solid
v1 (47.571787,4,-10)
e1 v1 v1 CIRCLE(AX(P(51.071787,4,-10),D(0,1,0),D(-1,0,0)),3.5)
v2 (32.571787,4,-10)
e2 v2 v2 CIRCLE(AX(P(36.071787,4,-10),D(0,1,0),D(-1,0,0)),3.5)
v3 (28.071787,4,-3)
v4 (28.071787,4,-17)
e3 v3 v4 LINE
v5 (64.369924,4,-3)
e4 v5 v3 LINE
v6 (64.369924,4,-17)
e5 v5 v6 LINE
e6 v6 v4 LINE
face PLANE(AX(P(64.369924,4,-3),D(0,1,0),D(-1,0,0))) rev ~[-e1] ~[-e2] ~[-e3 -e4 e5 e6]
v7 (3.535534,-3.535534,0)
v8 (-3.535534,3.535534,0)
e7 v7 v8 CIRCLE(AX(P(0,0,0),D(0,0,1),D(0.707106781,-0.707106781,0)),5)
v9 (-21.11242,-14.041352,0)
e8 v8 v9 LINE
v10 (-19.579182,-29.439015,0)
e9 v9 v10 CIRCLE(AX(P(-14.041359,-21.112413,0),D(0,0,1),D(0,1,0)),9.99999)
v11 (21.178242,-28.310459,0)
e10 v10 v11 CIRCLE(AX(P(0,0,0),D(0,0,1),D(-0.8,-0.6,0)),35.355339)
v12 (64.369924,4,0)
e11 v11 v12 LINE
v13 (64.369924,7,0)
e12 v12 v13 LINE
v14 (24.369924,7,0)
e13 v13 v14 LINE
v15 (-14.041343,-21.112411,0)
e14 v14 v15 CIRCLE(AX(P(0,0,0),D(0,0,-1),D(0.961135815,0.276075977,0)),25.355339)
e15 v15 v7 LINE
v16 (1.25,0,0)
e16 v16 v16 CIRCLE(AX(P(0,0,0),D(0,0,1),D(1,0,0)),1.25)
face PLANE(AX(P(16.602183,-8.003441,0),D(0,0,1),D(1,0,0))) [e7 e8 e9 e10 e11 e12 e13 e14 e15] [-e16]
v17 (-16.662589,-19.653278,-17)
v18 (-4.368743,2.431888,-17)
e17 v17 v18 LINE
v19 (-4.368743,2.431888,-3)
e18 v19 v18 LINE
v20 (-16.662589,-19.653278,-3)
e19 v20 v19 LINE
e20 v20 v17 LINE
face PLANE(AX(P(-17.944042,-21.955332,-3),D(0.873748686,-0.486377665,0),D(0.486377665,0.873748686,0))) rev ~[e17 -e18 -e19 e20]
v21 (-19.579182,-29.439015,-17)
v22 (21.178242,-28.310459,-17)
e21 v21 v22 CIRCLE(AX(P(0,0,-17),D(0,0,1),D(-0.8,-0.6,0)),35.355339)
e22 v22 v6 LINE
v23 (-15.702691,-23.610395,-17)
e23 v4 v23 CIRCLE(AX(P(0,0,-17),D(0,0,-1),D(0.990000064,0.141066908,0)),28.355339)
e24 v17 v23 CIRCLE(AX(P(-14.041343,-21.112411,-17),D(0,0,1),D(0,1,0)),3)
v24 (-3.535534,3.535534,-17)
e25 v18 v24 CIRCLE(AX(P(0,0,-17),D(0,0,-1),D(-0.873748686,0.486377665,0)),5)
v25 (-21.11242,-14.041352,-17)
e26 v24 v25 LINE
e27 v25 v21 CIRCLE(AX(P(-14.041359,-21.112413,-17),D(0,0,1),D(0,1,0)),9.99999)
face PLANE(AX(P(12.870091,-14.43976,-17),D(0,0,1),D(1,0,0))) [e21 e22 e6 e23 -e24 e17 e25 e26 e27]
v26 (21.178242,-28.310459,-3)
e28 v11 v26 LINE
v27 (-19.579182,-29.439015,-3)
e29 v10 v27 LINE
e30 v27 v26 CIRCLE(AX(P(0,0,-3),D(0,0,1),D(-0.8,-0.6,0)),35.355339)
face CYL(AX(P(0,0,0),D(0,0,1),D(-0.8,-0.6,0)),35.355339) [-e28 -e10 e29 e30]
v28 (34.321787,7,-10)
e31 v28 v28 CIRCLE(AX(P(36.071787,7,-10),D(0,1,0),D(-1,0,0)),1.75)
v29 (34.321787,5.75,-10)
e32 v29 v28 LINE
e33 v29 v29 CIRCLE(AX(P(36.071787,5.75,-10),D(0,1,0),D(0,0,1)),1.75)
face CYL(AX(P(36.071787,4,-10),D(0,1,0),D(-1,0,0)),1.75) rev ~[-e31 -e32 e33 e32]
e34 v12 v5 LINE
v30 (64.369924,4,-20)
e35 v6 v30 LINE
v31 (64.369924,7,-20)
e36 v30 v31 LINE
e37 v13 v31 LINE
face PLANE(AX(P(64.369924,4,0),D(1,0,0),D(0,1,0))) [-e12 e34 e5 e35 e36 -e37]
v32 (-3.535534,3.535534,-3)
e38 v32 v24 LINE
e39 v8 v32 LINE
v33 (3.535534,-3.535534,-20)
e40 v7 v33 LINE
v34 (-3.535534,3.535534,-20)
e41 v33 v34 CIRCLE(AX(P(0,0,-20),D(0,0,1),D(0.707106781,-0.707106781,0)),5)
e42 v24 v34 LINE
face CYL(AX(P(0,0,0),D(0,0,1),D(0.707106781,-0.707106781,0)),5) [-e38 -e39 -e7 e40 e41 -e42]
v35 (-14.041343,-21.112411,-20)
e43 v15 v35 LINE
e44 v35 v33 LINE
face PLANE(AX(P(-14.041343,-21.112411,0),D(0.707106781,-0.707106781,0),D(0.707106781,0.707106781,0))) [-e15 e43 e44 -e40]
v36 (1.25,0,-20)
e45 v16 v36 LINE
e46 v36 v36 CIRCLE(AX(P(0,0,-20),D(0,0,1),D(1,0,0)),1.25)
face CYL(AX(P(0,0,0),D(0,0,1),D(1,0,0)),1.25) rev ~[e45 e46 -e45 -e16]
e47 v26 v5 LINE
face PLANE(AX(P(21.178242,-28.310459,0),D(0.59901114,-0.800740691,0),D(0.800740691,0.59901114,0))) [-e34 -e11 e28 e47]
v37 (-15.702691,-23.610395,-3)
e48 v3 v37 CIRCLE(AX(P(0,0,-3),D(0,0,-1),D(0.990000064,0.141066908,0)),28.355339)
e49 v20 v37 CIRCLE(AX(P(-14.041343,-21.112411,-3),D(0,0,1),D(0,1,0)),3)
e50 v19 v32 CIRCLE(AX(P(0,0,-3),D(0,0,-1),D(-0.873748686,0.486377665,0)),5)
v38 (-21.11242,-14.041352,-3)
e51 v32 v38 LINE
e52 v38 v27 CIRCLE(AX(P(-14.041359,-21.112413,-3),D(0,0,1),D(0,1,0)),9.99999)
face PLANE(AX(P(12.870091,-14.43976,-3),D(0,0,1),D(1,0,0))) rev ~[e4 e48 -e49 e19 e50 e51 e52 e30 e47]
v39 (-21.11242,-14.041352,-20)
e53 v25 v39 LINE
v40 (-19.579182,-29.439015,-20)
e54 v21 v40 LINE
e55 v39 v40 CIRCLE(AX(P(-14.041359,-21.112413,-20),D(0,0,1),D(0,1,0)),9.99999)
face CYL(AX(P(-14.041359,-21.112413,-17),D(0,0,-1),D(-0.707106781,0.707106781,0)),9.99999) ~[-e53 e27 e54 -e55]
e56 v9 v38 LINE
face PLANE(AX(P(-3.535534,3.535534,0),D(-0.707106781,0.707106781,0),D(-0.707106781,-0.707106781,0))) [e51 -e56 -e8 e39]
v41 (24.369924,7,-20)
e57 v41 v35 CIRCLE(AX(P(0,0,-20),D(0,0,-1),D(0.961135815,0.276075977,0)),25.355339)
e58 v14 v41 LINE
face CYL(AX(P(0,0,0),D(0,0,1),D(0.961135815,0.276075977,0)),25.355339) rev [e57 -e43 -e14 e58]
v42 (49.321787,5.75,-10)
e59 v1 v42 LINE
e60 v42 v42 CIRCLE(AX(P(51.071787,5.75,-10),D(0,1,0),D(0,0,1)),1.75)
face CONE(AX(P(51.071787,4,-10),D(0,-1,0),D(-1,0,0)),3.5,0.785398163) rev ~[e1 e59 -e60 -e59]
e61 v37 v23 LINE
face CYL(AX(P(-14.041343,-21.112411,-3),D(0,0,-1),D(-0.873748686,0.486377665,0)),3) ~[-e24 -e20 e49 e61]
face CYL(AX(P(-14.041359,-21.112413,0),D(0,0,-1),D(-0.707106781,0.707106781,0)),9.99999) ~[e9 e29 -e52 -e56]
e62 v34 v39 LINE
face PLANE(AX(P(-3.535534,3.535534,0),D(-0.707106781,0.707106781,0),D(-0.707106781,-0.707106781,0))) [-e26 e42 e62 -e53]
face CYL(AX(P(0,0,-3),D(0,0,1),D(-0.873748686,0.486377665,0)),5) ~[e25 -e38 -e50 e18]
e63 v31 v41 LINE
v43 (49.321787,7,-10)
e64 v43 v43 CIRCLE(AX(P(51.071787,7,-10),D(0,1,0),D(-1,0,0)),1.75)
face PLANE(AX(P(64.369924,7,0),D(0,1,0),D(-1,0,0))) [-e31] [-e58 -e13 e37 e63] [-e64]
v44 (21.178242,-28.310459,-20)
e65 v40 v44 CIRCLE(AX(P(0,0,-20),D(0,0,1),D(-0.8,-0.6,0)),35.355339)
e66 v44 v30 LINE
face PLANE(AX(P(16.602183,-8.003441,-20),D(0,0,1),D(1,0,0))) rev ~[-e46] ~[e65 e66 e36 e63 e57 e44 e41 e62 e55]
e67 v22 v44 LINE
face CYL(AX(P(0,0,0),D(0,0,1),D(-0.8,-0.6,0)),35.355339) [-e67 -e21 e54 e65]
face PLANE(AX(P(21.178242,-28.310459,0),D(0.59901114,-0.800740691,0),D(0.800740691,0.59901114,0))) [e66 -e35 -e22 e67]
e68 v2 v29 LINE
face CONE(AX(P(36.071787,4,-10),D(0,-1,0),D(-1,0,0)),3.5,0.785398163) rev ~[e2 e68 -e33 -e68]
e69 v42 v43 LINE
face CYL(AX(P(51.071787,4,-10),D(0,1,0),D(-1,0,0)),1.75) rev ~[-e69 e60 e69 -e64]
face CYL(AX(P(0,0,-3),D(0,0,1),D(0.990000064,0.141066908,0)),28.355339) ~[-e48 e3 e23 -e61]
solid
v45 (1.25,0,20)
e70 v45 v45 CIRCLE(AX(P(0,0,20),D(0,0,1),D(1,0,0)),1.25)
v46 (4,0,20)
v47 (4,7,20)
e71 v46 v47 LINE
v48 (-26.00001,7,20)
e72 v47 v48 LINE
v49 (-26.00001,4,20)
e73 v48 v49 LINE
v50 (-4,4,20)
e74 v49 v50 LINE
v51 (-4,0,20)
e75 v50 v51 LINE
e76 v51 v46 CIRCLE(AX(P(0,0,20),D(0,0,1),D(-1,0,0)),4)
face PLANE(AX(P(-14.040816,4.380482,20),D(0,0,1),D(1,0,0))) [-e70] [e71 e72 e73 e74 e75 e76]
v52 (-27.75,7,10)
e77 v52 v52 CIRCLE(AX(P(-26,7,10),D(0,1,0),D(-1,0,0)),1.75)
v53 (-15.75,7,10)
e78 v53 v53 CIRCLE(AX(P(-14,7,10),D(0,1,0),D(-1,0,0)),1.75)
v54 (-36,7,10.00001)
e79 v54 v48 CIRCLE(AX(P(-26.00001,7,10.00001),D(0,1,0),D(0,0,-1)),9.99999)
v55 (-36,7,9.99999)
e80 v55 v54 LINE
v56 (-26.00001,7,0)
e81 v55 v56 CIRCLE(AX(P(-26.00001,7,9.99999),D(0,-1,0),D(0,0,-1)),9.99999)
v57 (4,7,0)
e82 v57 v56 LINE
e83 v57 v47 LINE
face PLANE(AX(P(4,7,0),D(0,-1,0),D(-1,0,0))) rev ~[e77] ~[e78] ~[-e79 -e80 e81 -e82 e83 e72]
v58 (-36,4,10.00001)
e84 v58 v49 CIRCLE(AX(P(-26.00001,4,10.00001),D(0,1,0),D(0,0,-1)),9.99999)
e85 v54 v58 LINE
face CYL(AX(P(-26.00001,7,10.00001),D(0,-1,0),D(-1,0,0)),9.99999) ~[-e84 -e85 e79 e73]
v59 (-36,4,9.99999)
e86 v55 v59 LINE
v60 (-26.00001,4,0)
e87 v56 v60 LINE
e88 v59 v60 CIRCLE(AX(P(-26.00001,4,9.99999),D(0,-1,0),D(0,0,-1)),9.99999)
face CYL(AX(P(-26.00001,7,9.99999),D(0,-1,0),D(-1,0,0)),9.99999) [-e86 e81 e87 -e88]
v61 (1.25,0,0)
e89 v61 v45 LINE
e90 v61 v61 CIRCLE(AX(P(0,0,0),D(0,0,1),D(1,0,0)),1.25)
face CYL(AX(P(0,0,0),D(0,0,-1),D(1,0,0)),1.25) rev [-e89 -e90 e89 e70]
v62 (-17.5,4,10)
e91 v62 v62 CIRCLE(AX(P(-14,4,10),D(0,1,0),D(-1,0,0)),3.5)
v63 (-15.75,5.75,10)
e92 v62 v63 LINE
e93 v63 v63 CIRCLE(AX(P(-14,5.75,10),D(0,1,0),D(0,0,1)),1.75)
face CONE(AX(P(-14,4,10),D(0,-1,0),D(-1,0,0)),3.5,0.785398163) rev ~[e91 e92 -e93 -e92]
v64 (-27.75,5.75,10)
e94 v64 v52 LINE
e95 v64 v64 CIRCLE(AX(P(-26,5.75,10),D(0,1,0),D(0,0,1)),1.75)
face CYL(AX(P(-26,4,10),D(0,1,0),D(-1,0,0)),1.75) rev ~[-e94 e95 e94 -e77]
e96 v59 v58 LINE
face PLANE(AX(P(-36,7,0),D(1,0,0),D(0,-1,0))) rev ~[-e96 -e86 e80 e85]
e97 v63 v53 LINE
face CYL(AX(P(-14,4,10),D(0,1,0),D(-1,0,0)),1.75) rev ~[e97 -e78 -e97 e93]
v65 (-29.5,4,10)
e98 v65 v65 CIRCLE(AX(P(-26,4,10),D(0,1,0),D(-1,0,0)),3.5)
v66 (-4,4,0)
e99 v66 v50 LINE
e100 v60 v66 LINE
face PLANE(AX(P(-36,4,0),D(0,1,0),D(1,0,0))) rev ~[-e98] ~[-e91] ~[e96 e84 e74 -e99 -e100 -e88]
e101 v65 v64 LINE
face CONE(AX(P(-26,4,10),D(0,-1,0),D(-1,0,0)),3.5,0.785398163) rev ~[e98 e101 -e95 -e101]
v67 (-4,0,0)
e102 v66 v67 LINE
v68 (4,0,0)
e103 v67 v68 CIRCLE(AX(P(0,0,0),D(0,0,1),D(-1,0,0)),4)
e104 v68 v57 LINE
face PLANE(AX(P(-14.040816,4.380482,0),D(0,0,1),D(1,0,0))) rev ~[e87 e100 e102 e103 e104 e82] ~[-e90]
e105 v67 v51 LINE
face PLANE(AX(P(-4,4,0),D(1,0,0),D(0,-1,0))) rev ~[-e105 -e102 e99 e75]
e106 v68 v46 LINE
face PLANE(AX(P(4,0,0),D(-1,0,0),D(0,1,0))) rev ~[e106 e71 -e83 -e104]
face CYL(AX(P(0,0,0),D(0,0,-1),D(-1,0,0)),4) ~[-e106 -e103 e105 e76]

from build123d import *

# Parameters (mm, degrees)
F0_R             = 1.25
F2_DEPTH         = 20
F1_R             = 1.25
F3_DEPTH         = 20
F4_START         = -3
F4_DEPTH         = 14
F5_R             = 9.99999
F5_2_R           = 9.99999
F6_R             = 3
F8_D             = 3.5
F8_DEPTH         = 20
F8_CSINK_D       = 7
F8_CSINK_ANGLE   = 90
F8_TIP           = 1.0515060833
F8_2_D           = 3.5
F8_2_DEPTH       = 20
F8_2_CSINK_D     = 7
F8_2_CSINK_ANGLE = 90
F8_2_TIP         = 1.0515060833


# Not quite as in the source:
# - a fillet or chamfer is up to 0.001 mm smaller than in the source, because OpenCascade refuses the exact size


with BuildPart() as f2:
    # F0 (on Top) → F2 (new body)
    with BuildSketch(Plane.XY):
        with BuildLine():
            Line((4, 7), (-36, 7))
            Line((-36, 7), (-36, 4))
            Line((-36, 4), (-4, 4))
            Line((-4, 4), (-4, 0))
            ThreePointArc((-4, 0), (0, -4), (4, 0))
            Line((4, 0), (4, 7))
        make_face()
        Circle(F0_R, mode=Mode.SUBTRACT)
    extrude(amount=F2_DEPTH)

    # F5 (radius 10 in the source; OpenCascade refuses exactly that, so slightly less here)
    f5_edges = [f2.edges().sort_by_distance(p)[0] for p in [
        (-36, 5.5, 20),
        (-36, 5.5, 0),
    ]]
    fillet(f5_edges, radius=F5_R)

    # F8
    with Locations(Plane.XZ.offset(-4)):
        with Locations((-26, 10), (-14, 10), (36.0717874951, -10), (51.0717874951, -10)):
            CounterSinkHole(F8_D / 2, F8_CSINK_D / 2, depth=F8_DEPTH, counter_sink_angle=F8_CSINK_ANGLE)
            with Locations((0, 0, -(F8_DEPTH + F8_TIP / 2))):  # 118° drill point
                Cone(0, F8_D / 2, F8_TIP, mode=Mode.SUBTRACT)


with BuildPart() as f3:
    # F1 (on Top) → F3 (new body)
    with BuildSketch(Plane.XY):
        with BuildLine():
            Line((-14.0413432173, -21.1124110292), (3.5355339059, -3.5355339059))
            ThreePointArc((3.5355339059, -3.5355339059), (3.5355339059, 3.5355339059), (-3.5355339059, 3.5355339059))
            ThreePointArc((-3.5355339059, 3.5355339059), (-3.9904772202, 3.0126552334), (-4.3687434308, 2.4318883272))
            Line((-4.3687434308, 2.4318883272), (-17.9440420579, -21.9553321039))
            ThreePointArc((-17.9440420579, -21.9553321039), (13.9306361328, -24.6974215274), (28.0717874951, 4))
            Line((28.0717874951, 4), (64.3699244729, 4))
            Line((64.3699244729, 4), (64.3699244729, 7))
            Line((64.3699244729, 7), (24.3699244729, 7))
            ThreePointArc((24.3699244729, 7), (14.9748726591, -20.4608506093), (-14.0413432173, -21.1124110292))
        make_face()
        Circle(F1_R, mode=Mode.SUBTRACT)
        with BuildLine():
            ThreePointArc((-4.3687434308, 2.4318883272), (-3.9904772202, 3.0126552334), (-3.5355339059, 3.5355339059))
            Line((-3.5355339059, 3.5355339059), (-28.2842712475, -21.2132034356))
            ThreePointArc((-28.2842712475, -21.2132034356), (-5.0216203507, -34.9969045639), (21.1782419461, -28.3104586341))
            Line((21.1782419461, -28.3104586341), (64.3699244729, 4))
            Line((64.3699244729, 4), (28.0717874951, 4))
            ThreePointArc((28.0717874951, 4), (13.9306361328, -24.6974215274), (-17.9440420579, -21.9553321039))
            Line((-17.9440420579, -21.9553321039), (-4.3687434308, 2.4318883272))
        make_face()
    extrude(amount=-F3_DEPTH)

    # F1 (on Top) → F4 (cut)
    with BuildSketch(Plane.XY.offset(F4_START)):
        with BuildLine():
            ThreePointArc((-4.3687434308, 2.4318883272), (-3.9904772202, 3.0126552334), (-3.5355339059, 3.5355339059))
            Line((-3.5355339059, 3.5355339059), (-28.2842712475, -21.2132034356))
            ThreePointArc((-28.2842712475, -21.2132034356), (-5.0216203507, -34.9969045639), (21.1782419461, -28.3104586341))
            Line((21.1782419461, -28.3104586341), (64.3699244729, 4))
            Line((64.3699244729, 4), (28.0717874951, 4))
            ThreePointArc((28.0717874951, 4), (13.9306361328, -24.6974215274), (-17.9440420579, -21.9553321039))
            Line((-17.9440420579, -21.9553321039), (-4.3687434308, 2.4318883272))
        make_face()
    extrude(amount=-F4_DEPTH, mode=Mode.SUBTRACT)

    # F5#2 (radius 10 in the source; OpenCascade refuses exactly that, so slightly less here)
    f5_2_edges = [f3.edges().sort_by_distance(p)[0] for p in [
        (-28.284271, -21.213203, -1.5),
        (-28.284271, -21.213203, -18.5),
    ]]
    fillet(f5_2_edges, radius=F5_2_R)

    # F6
    f6_edges = [f3.edges().sort_by_distance(p)[0] for p in [
        (-17.944042, -21.955332, -10),
    ]]
    fillet(f6_edges, radius=F6_R)

    # F8#2
    with Locations(Plane.XZ.offset(-4)):
        with Locations((-26, 10), (-14, 10), (36.0717874951, -10), (51.0717874951, -10)):
            CounterSinkHole(F8_2_D / 2, F8_2_CSINK_D / 2, depth=F8_2_DEPTH, counter_sink_angle=F8_2_CSINK_ANGLE)
            with Locations((0, 0, -(F8_2_DEPTH + F8_2_TIP / 2))):  # 118° drill point
                Cone(0, F8_2_D / 2, F8_2_TIP, mode=Mode.SUBTRACT)


solid = Compound([f2.part, f3.part])
